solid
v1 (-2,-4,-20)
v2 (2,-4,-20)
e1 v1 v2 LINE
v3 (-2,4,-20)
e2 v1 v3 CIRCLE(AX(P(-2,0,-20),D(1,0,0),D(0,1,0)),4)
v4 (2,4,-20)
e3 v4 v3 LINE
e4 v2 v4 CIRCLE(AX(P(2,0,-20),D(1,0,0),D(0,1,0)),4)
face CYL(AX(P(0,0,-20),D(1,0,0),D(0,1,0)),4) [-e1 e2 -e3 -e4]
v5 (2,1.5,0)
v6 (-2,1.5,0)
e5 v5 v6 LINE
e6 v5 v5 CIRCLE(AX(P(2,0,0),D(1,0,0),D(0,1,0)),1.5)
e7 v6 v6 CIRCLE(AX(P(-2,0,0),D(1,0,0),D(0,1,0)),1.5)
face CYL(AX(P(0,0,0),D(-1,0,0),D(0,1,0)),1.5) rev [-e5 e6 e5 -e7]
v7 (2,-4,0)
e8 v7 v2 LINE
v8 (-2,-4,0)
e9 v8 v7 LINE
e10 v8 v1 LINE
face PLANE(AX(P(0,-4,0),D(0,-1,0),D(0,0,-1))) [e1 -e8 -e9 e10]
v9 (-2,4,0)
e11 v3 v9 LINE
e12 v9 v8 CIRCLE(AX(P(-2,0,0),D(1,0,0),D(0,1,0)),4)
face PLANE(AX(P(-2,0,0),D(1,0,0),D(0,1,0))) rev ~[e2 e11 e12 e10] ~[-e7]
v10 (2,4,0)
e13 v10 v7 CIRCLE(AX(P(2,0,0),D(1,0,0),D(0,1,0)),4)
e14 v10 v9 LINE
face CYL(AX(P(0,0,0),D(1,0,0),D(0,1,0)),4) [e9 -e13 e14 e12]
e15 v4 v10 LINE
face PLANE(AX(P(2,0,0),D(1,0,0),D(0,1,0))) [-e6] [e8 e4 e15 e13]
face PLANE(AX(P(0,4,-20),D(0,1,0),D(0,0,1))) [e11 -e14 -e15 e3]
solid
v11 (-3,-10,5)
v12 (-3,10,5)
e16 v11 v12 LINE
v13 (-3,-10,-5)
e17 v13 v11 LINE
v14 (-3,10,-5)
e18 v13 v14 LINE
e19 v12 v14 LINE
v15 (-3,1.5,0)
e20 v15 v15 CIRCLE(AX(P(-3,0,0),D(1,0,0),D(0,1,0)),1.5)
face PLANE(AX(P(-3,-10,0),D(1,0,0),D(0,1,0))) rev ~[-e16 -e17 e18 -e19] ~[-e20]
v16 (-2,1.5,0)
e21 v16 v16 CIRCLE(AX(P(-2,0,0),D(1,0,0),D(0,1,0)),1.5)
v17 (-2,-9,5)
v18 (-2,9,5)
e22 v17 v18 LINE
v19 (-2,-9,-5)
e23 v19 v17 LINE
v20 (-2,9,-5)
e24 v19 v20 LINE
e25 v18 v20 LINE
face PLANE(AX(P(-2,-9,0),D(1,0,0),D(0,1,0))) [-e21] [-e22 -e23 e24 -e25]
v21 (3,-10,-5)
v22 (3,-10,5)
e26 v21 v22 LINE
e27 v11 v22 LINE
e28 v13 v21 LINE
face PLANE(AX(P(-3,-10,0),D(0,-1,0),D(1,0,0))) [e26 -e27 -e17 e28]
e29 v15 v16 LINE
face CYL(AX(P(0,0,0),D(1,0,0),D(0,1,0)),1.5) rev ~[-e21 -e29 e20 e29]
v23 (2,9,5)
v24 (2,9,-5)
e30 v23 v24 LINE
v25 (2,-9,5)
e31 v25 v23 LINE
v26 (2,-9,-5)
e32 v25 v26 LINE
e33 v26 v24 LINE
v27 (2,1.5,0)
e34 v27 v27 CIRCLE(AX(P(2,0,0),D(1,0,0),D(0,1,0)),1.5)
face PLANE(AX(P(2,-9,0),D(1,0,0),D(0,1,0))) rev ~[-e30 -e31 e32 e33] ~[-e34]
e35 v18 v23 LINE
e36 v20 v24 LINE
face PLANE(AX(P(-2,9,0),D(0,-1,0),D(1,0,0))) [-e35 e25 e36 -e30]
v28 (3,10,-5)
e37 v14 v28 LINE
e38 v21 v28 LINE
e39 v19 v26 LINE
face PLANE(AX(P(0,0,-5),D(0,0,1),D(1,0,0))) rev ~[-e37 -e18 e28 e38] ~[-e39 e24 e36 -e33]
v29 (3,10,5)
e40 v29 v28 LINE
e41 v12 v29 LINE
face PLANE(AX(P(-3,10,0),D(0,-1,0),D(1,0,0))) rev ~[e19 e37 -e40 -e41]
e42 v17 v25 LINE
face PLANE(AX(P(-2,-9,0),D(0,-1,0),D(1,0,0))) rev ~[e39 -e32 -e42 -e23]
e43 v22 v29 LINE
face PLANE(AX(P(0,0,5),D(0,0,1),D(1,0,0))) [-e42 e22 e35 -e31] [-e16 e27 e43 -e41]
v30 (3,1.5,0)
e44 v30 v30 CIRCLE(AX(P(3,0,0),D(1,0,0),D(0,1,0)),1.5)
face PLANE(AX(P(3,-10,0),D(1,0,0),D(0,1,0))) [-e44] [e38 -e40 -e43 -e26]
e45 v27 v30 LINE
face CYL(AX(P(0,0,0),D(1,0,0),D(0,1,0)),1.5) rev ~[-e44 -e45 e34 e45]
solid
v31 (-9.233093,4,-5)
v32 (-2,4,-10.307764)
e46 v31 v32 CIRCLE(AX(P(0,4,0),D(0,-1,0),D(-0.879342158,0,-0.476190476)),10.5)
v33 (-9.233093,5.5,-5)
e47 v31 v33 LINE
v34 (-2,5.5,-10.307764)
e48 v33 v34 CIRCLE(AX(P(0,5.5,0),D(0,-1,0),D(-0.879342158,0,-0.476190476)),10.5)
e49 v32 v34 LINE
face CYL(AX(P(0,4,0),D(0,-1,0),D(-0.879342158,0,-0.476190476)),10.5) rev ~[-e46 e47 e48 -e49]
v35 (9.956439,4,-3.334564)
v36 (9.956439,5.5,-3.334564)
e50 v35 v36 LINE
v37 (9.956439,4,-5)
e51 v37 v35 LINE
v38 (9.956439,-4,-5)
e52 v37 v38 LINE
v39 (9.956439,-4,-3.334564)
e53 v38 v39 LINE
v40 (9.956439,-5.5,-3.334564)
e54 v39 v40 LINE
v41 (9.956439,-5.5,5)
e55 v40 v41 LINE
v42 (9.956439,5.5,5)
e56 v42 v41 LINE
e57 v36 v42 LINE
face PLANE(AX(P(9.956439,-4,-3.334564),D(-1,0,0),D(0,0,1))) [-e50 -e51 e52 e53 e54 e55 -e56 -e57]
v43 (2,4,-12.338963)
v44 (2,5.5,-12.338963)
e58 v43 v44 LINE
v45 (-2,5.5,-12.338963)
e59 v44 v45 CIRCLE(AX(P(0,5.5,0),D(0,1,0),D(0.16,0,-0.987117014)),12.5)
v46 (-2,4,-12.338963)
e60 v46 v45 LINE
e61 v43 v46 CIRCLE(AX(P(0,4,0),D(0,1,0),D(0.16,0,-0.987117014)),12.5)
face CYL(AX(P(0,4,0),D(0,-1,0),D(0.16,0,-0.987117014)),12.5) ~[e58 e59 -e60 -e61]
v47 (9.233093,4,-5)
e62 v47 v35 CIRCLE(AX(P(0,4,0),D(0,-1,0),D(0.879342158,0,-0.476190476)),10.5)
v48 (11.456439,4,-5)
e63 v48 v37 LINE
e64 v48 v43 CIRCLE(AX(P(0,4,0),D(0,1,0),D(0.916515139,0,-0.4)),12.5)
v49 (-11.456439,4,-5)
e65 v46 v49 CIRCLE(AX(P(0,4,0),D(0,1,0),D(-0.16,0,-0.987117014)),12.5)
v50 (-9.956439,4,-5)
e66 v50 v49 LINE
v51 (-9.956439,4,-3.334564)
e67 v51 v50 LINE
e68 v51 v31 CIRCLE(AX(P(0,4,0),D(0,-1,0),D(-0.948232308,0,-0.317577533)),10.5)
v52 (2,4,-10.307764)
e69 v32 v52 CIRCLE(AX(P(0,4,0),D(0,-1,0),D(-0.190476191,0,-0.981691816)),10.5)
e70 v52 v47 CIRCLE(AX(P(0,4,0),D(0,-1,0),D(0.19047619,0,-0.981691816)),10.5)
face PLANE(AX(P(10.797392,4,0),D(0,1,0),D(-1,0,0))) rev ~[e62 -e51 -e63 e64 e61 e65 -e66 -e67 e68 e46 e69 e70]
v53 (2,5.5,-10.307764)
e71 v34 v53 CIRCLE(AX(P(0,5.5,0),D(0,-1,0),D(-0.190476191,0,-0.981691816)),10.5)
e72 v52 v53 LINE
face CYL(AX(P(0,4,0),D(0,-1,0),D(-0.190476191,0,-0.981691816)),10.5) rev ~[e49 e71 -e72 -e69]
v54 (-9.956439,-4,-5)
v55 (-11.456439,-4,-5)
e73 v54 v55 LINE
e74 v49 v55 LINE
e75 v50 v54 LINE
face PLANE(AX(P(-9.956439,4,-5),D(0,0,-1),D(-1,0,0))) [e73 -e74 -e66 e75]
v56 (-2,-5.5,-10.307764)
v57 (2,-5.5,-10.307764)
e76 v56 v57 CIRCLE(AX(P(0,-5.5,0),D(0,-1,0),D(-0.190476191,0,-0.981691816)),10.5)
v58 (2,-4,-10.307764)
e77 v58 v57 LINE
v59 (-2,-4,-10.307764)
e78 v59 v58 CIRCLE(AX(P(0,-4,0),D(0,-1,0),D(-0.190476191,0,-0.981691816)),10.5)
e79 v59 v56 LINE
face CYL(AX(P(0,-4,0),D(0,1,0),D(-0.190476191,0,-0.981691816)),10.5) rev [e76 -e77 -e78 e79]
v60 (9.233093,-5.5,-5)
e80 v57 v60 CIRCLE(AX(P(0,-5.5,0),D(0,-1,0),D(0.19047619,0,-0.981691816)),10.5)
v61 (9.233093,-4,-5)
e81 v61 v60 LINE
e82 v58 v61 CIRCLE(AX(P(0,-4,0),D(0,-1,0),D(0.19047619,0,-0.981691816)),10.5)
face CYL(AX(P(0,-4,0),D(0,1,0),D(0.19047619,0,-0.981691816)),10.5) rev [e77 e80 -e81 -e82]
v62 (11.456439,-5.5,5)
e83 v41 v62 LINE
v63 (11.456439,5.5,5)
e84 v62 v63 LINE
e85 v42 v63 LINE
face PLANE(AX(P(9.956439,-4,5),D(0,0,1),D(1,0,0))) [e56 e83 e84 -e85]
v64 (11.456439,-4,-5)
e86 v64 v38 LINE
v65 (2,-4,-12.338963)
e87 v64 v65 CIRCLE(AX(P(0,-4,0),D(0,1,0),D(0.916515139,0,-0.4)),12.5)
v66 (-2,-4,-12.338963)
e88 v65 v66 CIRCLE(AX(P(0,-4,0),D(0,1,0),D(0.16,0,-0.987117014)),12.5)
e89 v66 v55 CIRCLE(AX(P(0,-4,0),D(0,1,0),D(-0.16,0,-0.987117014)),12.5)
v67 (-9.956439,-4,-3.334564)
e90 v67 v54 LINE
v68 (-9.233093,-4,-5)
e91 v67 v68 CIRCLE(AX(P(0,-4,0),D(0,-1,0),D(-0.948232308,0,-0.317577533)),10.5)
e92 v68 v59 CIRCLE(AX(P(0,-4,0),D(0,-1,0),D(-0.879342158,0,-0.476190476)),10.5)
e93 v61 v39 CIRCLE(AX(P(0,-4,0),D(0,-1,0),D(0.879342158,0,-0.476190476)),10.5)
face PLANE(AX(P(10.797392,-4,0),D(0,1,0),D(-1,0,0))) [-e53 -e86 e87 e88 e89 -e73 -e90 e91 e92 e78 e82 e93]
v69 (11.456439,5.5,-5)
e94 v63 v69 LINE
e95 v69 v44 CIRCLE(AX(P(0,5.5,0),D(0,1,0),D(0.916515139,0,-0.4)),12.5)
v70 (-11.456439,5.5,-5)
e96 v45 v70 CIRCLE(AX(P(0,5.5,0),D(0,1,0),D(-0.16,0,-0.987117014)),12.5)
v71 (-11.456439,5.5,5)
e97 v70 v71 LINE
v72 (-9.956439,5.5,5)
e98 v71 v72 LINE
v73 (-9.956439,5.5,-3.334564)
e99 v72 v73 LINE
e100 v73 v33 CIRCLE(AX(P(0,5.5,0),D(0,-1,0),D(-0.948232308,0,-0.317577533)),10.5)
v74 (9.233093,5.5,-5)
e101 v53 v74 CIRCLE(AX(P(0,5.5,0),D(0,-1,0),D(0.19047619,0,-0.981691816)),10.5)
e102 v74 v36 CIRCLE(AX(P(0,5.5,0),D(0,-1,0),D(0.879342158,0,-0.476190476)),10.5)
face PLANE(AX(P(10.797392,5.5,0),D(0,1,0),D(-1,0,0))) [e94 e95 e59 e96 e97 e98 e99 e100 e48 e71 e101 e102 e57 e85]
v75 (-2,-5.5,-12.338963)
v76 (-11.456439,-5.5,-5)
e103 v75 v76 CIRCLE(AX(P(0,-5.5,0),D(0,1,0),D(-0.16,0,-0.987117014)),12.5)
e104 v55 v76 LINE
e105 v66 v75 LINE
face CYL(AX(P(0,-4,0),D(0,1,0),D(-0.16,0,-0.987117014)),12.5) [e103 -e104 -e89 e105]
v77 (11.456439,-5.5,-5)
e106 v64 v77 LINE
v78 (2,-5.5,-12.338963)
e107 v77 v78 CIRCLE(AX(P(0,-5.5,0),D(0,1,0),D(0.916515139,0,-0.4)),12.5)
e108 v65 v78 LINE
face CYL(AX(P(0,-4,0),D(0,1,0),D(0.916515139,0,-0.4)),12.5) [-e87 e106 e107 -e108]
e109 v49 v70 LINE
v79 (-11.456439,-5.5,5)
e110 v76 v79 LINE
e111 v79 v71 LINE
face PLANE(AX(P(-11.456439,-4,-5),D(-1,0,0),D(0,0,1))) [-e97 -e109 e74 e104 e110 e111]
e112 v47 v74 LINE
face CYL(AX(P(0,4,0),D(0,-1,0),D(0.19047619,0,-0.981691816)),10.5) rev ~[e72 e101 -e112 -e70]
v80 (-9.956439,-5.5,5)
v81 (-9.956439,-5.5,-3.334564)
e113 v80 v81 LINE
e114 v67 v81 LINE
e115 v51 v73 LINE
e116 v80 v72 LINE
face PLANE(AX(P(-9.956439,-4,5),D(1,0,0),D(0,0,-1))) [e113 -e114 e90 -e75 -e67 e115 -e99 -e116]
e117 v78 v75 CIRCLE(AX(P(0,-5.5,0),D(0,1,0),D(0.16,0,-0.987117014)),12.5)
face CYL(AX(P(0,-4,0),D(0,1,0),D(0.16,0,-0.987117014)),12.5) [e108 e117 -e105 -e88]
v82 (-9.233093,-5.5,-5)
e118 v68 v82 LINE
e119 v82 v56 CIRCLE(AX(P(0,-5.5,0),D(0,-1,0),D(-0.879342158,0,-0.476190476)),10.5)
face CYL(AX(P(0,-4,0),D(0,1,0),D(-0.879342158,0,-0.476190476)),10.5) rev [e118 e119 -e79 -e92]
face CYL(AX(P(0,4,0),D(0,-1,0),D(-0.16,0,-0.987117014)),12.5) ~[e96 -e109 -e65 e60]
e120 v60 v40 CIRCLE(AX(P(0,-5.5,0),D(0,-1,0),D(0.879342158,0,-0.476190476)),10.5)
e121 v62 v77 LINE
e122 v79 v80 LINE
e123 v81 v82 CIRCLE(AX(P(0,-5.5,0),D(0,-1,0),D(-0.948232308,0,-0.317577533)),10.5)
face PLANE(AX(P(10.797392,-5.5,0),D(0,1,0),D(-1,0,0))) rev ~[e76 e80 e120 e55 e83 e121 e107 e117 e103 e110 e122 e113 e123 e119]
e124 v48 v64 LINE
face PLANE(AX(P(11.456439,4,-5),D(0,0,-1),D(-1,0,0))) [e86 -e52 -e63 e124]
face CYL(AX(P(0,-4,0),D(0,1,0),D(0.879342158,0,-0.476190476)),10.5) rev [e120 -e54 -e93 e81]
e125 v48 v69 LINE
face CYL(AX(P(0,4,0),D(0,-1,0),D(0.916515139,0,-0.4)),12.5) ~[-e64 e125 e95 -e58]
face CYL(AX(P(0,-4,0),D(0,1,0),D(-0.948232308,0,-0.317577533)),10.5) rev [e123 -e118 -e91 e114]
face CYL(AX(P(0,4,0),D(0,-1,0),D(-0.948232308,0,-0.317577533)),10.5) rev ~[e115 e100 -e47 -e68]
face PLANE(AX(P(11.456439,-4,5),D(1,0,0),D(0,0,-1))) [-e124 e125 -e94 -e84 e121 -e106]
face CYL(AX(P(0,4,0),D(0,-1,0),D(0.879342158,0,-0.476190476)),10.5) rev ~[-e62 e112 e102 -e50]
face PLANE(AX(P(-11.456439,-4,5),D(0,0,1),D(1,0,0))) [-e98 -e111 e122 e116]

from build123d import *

# Parameters (mm, degrees)
F0_R     = 1.5
F1_DEPTH = 2
F2_W     = 6
F2_H     = 20
F2_W_2   = 4
F2_H_2   = 18
F3_DEPTH = 5
F4_DEPTH = 12.5
F6_DEPTH = 1.5
F7_DEPTH = 8
F8_START = -8
F8_DEPTH = 1.5


# Not quite as in the source:
# - a feature names something its author has since deleted; it is built from what else it names


with BuildPart() as f1:
    # F0 (on Right) → F1 (new body, symmetric)
    with BuildSketch(Plane.YZ):
        with BuildLine():
            ThreePointArc((-4, 0), (0, -4), (4, 0))
            ThreePointArc((4, 0), (0, 4), (-4, 0))
        make_face()
        Circle(F0_R, mode=Mode.SUBTRACT)
        with BuildLine():
            Line((4, -20), (4, 0))
            ThreePointArc((4, 0), (0, -4), (-4, 0))
            Line((-4, 0), (-4, -20))
            ThreePointArc((-4, -20), (0, -16), (4, -20))
        make_face()
        with BuildLine():
            ThreePointArc((-4, -20), (0, -24), (4, -20))
            ThreePointArc((4, -20), (0, -16), (-4, -20))
        make_face()
    extrude(amount=F1_DEPTH, both=True)


with BuildPart() as f3:
    # F2 (on Top) → F3 (new body, symmetric)
    with BuildSketch(Plane.XY):
        Rectangle(F2_W, F2_H)
        Rectangle(F2_W_2, F2_H_2, mode=Mode.SUBTRACT)
    extrude(amount=F3_DEPTH, both=True)

    # F0 (on Right) → F4 (cut, symmetric)
    with BuildSketch(Plane.YZ):
        Circle(F0_R)
    extrude(amount=F4_DEPTH, both=True, mode=Mode.SUBTRACT)


with BuildPart() as f6:
    # F5 (on face) → F6 (new body)
    with BuildSketch(Plane(origin=(0, 4, 0), x_dir=(-1, 0, 0), z_dir=(0, 1, 0))):
        with BuildLine():
            ThreePointArc((-9.9564392374, -3.3345640963), (-10.5, 0), (-9.9564392374, 3.3345640963))
            Line((-9.9564392374, 3.3345640963), (-9.9564392374, 5))
            Line((-9.9564392374, 5), (-11.4564392374, 5))
            Line((-11.4564392374, 5), (-11.4564392374, -5))
            Line((-11.4564392374, -5), (-9.9564392374, -5))
            Line((-9.9564392374, -5), (-9.9564392374, -3.3345640963))
        make_face()
        with BuildLine():
            Line((2, -12.3389626793), (2, -10.307764064))
            ThreePointArc((2, -10.307764064), (0, -10.5), (-2, -10.307764064))
            Line((-2, -10.307764064), (-2, -12.3389626793))
            ThreePointArc((-2, -12.3389626793), (0, -12.5), (2, -12.3389626793))
        make_face()
        with BuildLine():
            ThreePointArc((9.9564392374, 3.3345640963), (10.3632189013, 1.6892880168), (10.5, 0))
            ThreePointArc((10.5, 0), (10.3632189013, -1.6892880168), (9.9564392374, -3.3345640963))
            Line((9.9564392374, -3.3345640963), (9.9564392374, -5))
            Line((9.9564392374, -5), (11.4564392374, -5))
            Line((11.4564392374, -5), (11.4564392374, 5))
            Line((11.4564392374, 5), (9.9564392374, 5))
            Line((9.9564392374, 5), (9.9564392374, 3.3345640963))
        make_face()
        with BuildLine():
            ThreePointArc((9.9564392374, -3.3345640963), (10.3632189013, -1.6892880168), (10.5, 0))
            ThreePointArc((10.5, 0), (10.3632189013, 1.6892880168), (9.9564392374, 3.3345640963))
            Line((9.9564392374, 3.3345640963), (9.9564392374, -3.3345640963))
        make_face()
        with BuildLine():
            Line((9.9564392374, -5), (9.2330926563, -5))
            ThreePointArc((9.2330926563, -5), (6.2119789517, -8.4653007923), (2, -10.307764064))
            Line((2, -10.307764064), (2, -12.3389626793))
            ThreePointArc((2, -12.3389626793), (7.6638131853, -9.8750173398), (11.4564392374, -5))
            Line((11.4564392374, -5), (9.9564392374, -5))
        make_face()
        with BuildLine():
            Line((-2, -12.3389626793), (-2, -10.307764064))
            ThreePointArc((-2, -10.307764064), (-6.2119789517, -8.4653007923), (-9.2330926563, -5))
            Line((-9.2330926563, -5), (-9.9564392374, -5))
            Line((-9.9564392374, -5), (-11.4564392374, -5))
            ThreePointArc((-11.4564392374, -5), (-7.6638131853, -9.8750173398), (-2, -12.3389626793))
        make_face()
        with BuildLine():
            ThreePointArc((-9.2330926563, -5), (-9.6308334407, -4.1829471952), (-9.9564392374, -3.3345640963))
            Line((-9.9564392374, -3.3345640963), (-9.9564392374, -5))
            Line((-9.9564392374, -5), (-9.2330926563, -5))
        make_face()
        with BuildLine():
            Line((-9.9564392374, -3.3345640963), (-9.9564392374, 3.3345640963))
            ThreePointArc((-9.9564392374, 3.3345640963), (-10.5, 0), (-9.9564392374, -3.3345640963))
        make_face()
        with BuildLine():
            Line((9.9564392374, -5), (9.9564392374, -3.3345640963))
            ThreePointArc((9.9564392374, -3.3345640963), (9.6308334407, -4.1829471952), (9.2330926563, -5))
            Line((9.2330926563, -5), (9.9564392374, -5))
        make_face()
    extrude(amount=F6_DEPTH)

    # F5 (on face) → F7 (join, through all)
    with BuildSketch(Plane(origin=(0, 4, 0), x_dir=(-1, 0, 0), z_dir=(0, 1, 0))):
        with BuildLine():
            ThreePointArc((9.9564392374, 3.3345640963), (10.3632189013, 1.6892880168), (10.5, 0))
            ThreePointArc((10.5, 0), (10.3632189013, -1.6892880168), (9.9564392374, -3.3345640963))
            Line((9.9564392374, -3.3345640963), (9.9564392374, -5))
            Line((9.9564392374, -5), (11.4564392374, -5))
            Line((11.4564392374, -5), (11.4564392374, 5))
            Line((11.4564392374, 5), (9.9564392374, 5))
            Line((9.9564392374, 5), (9.9564392374, 3.3345640963))
        make_face()
        with BuildLine():
            ThreePointArc((-9.9564392374, -3.3345640963), (-10.5, 0), (-9.9564392374, 3.3345640963))
            Line((-9.9564392374, 3.3345640963), (-9.9564392374, 5))
            Line((-9.9564392374, 5), (-11.4564392374, 5))
            Line((-11.4564392374, 5), (-11.4564392374, -5))
            Line((-11.4564392374, -5), (-9.9564392374, -5))
            Line((-9.9564392374, -5), (-9.9564392374, -3.3345640963))
        make_face()
        with BuildLine():
            ThreePointArc((9.9564392374, -3.3345640963), (10.3632189013, -1.6892880168), (10.5, 0))
            ThreePointArc((10.5, 0), (10.3632189013, 1.6892880168), (9.9564392374, 3.3345640963))
            Line((9.9564392374, 3.3345640963), (9.9564392374, -3.3345640963))
        make_face()
        with BuildLine():
            Line((-9.9564392374, -3.3345640963), (-9.9564392374, 3.3345640963))
            ThreePointArc((-9.9564392374, 3.3345640963), (-10.5, 0), (-9.9564392374, -3.3345640963))
        make_face()
    extrude(amount=-F7_DEPTH)

    # F5 (on face) → F8 (join)
    with BuildSketch(Plane(origin=(0, 4, 0), x_dir=(-1, 0, 0), z_dir=(0, 1, 0)).offset(F8_START)):
        with BuildLine():
            ThreePointArc((-9.9564392374, -3.3345640963), (-10.5, 0), (-9.9564392374, 3.3345640963))
            Line((-9.9564392374, 3.3345640963), (-9.9564392374, 5))
            Line((-9.9564392374, 5), (-11.4564392374, 5))
            Line((-11.4564392374, 5), (-11.4564392374, -5))
            Line((-11.4564392374, -5), (-9.9564392374, -5))
            Line((-9.9564392374, -5), (-9.9564392374, -3.3345640963))
        make_face()
        with BuildLine():
            ThreePointArc((9.9564392374, 3.3345640963), (10.3632189013, 1.6892880168), (10.5, 0))
            ThreePointArc((10.5, 0), (10.3632189013, -1.6892880168), (9.9564392374, -3.3345640963))
            Line((9.9564392374, -3.3345640963), (9.9564392374, -5))
            Line((9.9564392374, -5), (11.4564392374, -5))
            Line((11.4564392374, -5), (11.4564392374, 5))
            Line((11.4564392374, 5), (9.9564392374, 5))
            Line((9.9564392374, 5), (9.9564392374, 3.3345640963))
        make_face()
        with BuildLine():
            Line((9.9564392374, -5), (9.2330926563, -5))
            ThreePointArc((9.2330926563, -5), (6.2119789517, -8.4653007923), (2, -10.307764064))
            Line((2, -10.307764064), (2, -12.3389626793))
            ThreePointArc((2, -12.3389626793), (7.6638131853, -9.8750173398), (11.4564392374, -5))
            Line((11.4564392374, -5), (9.9564392374, -5))
        make_face()
        with BuildLine():
            Line((-2, -12.3389626793), (-2, -10.307764064))
            ThreePointArc((-2, -10.307764064), (-6.2119789517, -8.4653007923), (-9.2330926563, -5))
            Line((-9.2330926563, -5), (-9.9564392374, -5))
            Line((-9.9564392374, -5), (-11.4564392374, -5))
            ThreePointArc((-11.4564392374, -5), (-7.6638131853, -9.8750173398), (-2, -12.3389626793))
        make_face()
        with BuildLine():
            Line((2, -12.3389626793), (2, -10.307764064))
            ThreePointArc((2, -10.307764064), (0, -10.5), (-2, -10.307764064))
            Line((-2, -10.307764064), (-2, -12.3389626793))
            ThreePointArc((-2, -12.3389626793), (0, -12.5), (2, -12.3389626793))
        make_face()
        with BuildLine():
            ThreePointArc((9.9564392374, -3.3345640963), (10.3632189013, -1.6892880168), (10.5, 0))
            ThreePointArc((10.5, 0), (10.3632189013, 1.6892880168), (9.9564392374, 3.3345640963))
            Line((9.9564392374, 3.3345640963), (9.9564392374, -3.3345640963))
        make_face()
        with BuildLine():
            Line((-9.9564392374, -3.3345640963), (-9.9564392374, 3.3345640963))
            ThreePointArc((-9.9564392374, 3.3345640963), (-10.5, 0), (-9.9564392374, -3.3345640963))
        make_face()
        with BuildLine():
            Line((9.9564392374, -5), (9.9564392374, -3.3345640963))
            ThreePointArc((9.9564392374, -3.3345640963), (9.6308334407, -4.1829471952), (9.2330926563, -5))
            Line((9.2330926563, -5), (9.9564392374, -5))
        make_face()
        with BuildLine():
            ThreePointArc((-9.2330926563, -5), (-9.6308334407, -4.1829471952), (-9.9564392374, -3.3345640963))
            Line((-9.9564392374, -3.3345640963), (-9.9564392374, -5))
            Line((-9.9564392374, -5), (-9.2330926563, -5))
        make_face()
    extrude(amount=-F8_DEPTH)


solid = Compound([f1.part, f3.part, f6.part])
